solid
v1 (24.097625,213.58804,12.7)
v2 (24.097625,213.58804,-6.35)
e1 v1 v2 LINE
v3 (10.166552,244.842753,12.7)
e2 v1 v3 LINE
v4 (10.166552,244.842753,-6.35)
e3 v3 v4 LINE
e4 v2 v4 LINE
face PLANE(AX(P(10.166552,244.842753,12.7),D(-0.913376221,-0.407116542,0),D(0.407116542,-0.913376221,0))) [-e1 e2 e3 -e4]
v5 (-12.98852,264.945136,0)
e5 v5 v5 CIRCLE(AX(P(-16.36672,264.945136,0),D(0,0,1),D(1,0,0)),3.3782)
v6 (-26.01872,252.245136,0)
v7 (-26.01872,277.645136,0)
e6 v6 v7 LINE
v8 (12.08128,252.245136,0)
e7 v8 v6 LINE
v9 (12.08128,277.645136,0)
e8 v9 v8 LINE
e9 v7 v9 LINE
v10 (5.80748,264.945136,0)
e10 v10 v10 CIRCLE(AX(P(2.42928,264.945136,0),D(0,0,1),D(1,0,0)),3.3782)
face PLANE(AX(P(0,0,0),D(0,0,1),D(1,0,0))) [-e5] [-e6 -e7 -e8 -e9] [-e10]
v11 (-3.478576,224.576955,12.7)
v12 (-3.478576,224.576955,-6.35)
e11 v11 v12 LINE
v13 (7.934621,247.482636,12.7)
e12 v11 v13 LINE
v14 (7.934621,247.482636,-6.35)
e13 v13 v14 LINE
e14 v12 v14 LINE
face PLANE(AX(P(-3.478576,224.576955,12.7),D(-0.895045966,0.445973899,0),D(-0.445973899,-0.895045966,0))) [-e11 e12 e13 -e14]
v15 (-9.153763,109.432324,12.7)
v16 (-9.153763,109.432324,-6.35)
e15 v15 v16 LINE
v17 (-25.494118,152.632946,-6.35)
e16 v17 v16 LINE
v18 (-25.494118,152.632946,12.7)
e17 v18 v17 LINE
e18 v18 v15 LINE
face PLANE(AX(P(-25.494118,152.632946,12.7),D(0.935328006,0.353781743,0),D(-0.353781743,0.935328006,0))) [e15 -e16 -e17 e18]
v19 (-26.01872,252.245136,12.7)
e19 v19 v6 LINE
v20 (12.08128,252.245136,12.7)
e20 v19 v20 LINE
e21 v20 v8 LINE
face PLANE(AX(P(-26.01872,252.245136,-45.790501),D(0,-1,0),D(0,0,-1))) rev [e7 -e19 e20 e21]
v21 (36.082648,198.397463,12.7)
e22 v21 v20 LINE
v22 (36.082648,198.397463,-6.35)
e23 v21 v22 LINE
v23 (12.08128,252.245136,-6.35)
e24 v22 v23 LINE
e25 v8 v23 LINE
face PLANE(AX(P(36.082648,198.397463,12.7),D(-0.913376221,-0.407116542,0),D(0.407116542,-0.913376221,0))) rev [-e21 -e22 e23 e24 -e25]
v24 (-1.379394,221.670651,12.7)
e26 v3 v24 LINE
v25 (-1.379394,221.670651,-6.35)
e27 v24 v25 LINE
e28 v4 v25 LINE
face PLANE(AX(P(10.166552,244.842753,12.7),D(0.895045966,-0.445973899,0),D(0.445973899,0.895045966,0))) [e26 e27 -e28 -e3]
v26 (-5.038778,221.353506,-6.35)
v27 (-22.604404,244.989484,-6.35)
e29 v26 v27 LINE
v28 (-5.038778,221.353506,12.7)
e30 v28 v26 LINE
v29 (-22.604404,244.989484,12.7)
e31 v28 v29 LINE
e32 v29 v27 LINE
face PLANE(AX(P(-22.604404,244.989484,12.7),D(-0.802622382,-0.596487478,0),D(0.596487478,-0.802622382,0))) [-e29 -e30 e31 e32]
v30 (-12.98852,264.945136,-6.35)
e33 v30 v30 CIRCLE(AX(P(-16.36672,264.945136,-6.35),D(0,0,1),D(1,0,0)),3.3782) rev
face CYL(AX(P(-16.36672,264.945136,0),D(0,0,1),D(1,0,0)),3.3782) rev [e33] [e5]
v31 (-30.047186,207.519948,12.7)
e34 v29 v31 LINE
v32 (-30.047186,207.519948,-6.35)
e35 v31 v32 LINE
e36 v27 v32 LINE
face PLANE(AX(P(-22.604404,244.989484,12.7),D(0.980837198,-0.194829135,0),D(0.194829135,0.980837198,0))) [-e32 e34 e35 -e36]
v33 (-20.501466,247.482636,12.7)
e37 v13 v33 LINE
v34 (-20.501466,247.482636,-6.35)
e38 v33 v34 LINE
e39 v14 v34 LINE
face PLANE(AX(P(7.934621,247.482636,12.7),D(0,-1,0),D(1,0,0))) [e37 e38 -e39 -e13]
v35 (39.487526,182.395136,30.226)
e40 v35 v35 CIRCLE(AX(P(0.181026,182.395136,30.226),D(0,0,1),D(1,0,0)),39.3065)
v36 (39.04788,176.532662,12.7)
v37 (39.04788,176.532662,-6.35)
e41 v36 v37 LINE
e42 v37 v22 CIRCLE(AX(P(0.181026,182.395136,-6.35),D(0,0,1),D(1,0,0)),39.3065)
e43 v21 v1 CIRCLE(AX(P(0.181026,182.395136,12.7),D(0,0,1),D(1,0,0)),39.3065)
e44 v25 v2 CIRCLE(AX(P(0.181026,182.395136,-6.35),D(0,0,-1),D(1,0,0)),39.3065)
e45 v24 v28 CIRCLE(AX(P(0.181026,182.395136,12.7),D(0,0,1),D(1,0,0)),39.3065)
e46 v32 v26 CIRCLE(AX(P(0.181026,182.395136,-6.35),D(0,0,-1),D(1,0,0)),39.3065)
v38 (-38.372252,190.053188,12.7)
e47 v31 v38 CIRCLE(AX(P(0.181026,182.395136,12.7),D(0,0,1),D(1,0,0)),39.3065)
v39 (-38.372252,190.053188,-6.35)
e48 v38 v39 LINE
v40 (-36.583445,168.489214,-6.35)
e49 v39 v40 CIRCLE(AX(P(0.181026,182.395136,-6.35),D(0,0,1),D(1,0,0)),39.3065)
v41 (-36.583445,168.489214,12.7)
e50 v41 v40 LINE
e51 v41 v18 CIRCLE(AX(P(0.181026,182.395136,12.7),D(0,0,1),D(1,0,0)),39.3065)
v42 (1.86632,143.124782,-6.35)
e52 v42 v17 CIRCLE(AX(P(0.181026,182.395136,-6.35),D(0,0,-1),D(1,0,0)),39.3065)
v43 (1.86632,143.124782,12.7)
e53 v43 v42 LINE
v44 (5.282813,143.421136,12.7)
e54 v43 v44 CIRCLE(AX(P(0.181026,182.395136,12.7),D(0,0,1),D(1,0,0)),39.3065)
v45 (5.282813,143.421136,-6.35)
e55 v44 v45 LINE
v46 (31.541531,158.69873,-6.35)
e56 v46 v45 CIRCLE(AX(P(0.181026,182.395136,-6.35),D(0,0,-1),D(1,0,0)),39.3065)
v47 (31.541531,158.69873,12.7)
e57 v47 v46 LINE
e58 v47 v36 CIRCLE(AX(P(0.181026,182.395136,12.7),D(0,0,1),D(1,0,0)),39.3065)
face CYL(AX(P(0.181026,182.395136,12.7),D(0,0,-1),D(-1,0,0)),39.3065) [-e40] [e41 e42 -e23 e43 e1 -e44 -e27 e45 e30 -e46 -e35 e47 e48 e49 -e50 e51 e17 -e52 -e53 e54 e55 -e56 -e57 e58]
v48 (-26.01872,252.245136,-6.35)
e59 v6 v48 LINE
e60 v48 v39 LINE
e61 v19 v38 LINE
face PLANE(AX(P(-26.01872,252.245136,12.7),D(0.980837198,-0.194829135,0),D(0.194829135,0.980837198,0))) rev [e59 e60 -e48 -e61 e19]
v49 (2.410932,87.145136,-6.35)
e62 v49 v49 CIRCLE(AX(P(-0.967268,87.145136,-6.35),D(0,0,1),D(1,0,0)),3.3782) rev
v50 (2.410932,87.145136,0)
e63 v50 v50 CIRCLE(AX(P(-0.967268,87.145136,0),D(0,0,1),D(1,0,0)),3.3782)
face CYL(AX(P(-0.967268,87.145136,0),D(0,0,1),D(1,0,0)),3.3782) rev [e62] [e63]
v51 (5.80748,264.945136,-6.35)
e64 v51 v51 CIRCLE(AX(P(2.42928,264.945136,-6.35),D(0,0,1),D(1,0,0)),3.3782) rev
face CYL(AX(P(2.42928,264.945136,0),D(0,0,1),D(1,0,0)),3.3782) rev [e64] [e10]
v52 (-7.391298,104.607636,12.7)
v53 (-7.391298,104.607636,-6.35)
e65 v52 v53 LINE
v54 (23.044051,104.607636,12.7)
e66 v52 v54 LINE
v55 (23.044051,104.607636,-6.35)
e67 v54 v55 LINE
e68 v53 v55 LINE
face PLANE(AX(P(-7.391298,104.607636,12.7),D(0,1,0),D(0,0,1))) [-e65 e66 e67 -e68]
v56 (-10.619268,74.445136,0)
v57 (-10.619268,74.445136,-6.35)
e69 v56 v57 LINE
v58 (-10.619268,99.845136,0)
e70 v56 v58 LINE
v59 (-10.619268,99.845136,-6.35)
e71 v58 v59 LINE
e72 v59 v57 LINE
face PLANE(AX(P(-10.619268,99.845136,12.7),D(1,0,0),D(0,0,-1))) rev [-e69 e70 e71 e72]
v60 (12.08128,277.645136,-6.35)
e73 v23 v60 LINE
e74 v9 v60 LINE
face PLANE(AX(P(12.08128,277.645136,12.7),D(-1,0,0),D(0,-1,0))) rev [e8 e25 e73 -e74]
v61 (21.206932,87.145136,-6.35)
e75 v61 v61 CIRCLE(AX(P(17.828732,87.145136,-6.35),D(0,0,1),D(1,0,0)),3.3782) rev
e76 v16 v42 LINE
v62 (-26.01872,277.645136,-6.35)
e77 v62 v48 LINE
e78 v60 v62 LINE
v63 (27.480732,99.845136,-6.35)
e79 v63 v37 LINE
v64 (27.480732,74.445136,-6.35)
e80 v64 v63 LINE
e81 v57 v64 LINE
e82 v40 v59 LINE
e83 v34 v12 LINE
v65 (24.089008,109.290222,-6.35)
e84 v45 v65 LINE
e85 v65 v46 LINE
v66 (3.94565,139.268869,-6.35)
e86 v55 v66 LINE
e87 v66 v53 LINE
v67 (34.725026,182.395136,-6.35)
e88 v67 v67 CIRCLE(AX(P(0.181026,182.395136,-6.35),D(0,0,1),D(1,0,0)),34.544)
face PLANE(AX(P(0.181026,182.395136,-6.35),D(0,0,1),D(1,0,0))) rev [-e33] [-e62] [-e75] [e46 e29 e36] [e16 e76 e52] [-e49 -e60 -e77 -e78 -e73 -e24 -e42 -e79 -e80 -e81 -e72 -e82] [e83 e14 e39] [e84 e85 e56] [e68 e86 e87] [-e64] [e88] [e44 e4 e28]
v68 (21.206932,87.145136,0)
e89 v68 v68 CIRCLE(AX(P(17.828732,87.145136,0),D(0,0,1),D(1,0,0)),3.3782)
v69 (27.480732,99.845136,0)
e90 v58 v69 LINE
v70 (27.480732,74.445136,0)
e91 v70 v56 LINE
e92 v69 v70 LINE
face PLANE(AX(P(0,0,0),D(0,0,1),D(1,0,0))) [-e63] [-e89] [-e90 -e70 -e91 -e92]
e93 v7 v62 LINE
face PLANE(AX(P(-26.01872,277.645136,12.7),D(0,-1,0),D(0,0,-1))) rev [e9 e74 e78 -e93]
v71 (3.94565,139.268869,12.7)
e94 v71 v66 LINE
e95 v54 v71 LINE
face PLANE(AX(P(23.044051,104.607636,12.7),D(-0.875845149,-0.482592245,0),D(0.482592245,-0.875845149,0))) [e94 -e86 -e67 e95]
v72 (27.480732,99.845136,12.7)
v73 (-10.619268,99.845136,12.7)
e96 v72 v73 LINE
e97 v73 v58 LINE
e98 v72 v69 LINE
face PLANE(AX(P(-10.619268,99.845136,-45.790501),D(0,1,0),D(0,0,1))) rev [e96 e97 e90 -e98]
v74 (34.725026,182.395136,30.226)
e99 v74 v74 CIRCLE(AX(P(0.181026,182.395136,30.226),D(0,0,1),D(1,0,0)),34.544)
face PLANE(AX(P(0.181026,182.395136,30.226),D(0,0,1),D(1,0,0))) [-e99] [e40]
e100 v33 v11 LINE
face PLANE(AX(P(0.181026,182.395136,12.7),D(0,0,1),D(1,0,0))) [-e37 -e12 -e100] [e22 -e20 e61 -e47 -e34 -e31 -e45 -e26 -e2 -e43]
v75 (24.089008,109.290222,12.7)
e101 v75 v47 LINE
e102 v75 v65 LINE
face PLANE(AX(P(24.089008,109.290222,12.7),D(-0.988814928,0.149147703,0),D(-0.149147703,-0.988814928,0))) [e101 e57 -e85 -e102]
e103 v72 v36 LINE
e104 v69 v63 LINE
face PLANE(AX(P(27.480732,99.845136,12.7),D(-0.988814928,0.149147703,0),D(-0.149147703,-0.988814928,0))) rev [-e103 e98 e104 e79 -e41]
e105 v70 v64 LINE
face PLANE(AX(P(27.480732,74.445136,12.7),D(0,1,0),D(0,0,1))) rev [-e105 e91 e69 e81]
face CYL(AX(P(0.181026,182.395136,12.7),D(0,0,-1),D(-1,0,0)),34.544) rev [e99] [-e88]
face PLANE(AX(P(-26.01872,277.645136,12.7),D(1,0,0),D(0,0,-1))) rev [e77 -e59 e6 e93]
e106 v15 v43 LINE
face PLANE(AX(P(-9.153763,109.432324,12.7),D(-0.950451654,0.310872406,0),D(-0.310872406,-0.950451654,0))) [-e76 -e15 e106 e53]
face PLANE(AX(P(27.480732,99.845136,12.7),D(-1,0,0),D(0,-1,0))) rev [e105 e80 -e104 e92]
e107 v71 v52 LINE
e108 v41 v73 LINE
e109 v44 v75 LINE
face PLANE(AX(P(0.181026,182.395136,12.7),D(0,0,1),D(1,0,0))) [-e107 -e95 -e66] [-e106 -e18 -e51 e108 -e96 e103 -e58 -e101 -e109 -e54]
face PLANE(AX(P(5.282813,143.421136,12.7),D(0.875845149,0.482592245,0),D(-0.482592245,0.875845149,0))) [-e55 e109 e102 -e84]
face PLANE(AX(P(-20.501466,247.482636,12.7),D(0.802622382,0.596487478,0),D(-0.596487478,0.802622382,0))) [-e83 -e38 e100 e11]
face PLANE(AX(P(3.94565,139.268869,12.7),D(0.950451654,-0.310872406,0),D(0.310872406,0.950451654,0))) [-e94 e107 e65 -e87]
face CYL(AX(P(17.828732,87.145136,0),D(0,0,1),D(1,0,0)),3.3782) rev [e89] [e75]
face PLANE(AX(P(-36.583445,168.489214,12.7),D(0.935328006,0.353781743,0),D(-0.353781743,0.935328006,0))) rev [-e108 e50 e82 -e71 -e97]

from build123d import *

# Parameters (mm, degrees)
MAIN_START                  = -6.35
MAIN_BODY_EXTRUDE_OUTLINE_R = 34.544
MAIN_BODY_EXTRUDE_DEPTH     = 19.05
A_START                     = -12.7
SKETCH3_W                   = 38.1
SKETCH3_H                   = 25.4
A_ARM_CUT_EXTRUDE_DEPTH     = 12.7
SKETCH2_R                   = 39.3065
SKETCH2_R_2                 = 34.544
WHEEL_BEARING_EXTRUDE_DEPTH = 17.526
F_1_4_CLEARANCE_HOLE1_D     = 6.7564


# Read off the part's stored shape, not the designer's step: Main Body Extrude
with BuildPart() as part:
    # Main Body Extrude outline → Main Body Extrude (new body)
    with BuildSketch(Plane.XY.offset(MAIN_START)):
        with BuildLine():
            Line((27.480731972, 99.845136477), (39.047879642, 176.532662304))
            ThreePointArc((39.047879642, 176.532662304), (39.130976131, 187.677399272), (36.082648081, 198.397462855))
            Line((36.082648081, 198.397462855), (12.081280182, 252.245136477))
            Line((12.081280182, 252.245136477), (12.081280182, 277.645136477))
            Line((12.081280182, 277.645136477), (-26.018719818, 277.645136477))
            Line((-26.018719818, 277.645136477), (-26.018719818, 252.245136477))
            Line((-26.018719818, 252.245136477), (-38.372251652, 190.053187868))
            ThreePointArc((-38.372251652, 190.053187868), (-38.990928758, 179.14568581), (-36.583444609, 168.489214415))
            Line((-36.583444609, 168.489214415), (-10.619268028, 99.845136477))
            Line((-10.619268028, 99.845136477), (-10.619268028, 74.445136477))
            Line((-10.619268028, 74.445136477), (27.480731972, 74.445136477))
            Line((27.480731972, 74.445136477), (27.480731972, 99.845136477))
        make_face()
        with BuildLine():
            ThreePointArc((-25.494117557, 152.632946315), (-12.721668299, 145.266691439), (1.866319763, 143.124782188))
            Line((1.866319763, 143.124782188), (-9.153762694, 109.432323748))
            Line((-9.153762694, 109.432323748), (-25.494117557, 152.632946315))
        make_face(mode=Mode.SUBTRACT)
        Polygon((-7.391297603, 104.607636477), (3.945650004, 139.268868599), (23.044050934, 104.607636477), align=None, mode=Mode.SUBTRACT)
        with BuildLine():
            ThreePointArc((5.282813212, 143.421136093), (19.947813793, 148.420513168), (31.541530581, 158.698730145))
            Line((31.541530581, 158.698730145), (24.089008073, 109.290221793))
            Line((24.089008073, 109.290221793), (5.282813212, 143.421136093))
        make_face(mode=Mode.SUBTRACT)
        with BuildLine():
            ThreePointArc((-5.038778466, 221.353506402), (-18.844806738, 216.790174549), (-30.047186356, 207.519947737))
            Line((-30.047186356, 207.519947737), (-22.604404483, 244.989483896))
            Line((-22.604404483, 244.989483896), (-5.038778466, 221.353506402))
        make_face(mode=Mode.SUBTRACT)
        Polygon((-3.478576257, 224.576955104), (-20.501465739, 247.482636477), (7.934620863, 247.482636477), align=None, mode=Mode.SUBTRACT)
        with Locations((0.181025656, 182.395136477)):
            Circle(MAIN_BODY_EXTRUDE_OUTLINE_R, mode=Mode.SUBTRACT)
        with BuildLine():
            Line((-1.379394493, 221.670650875), (10.166551929, 244.842753057))
            Line((10.166551929, 244.842753057), (24.09762487, 213.588039906))
            ThreePointArc((24.09762487, 213.588039906), (12.067229239, 219.861376035), (-1.379394493, 221.670650875))
        make_face(mode=Mode.SUBTRACT)
    extrude(amount=MAIN_BODY_EXTRUDE_DEPTH)

    # Sketch3 → A Arm Cut Extrude (cut)
    with BuildSketch(Plane.XY.offset(12.7).offset(A_START)):
        with Locations((-6.968719818, 264.945136477)):
            Rectangle(SKETCH3_W, SKETCH3_H)
        with Locations((8.430731972, 87.145136477)):
            Rectangle(SKETCH3_W, SKETCH3_H)
    extrude(amount=A_ARM_CUT_EXTRUDE_DEPTH, mode=Mode.SUBTRACT)

    # Sketch2 → Wheel Bearing Extrude (add)
    with BuildSketch(Plane.XY.offset(12.7)):
        with Locations(Location((0.181025656, 182.395136477, 0), (0, 0, 168.765257697))):
            Circle(SKETCH2_R)
        with Locations((0.181025656, 182.395136477)):
            Circle(SKETCH2_R_2, mode=Mode.SUBTRACT)
    extrude(amount=WHEEL_BEARING_EXTRUDE_DEPTH)

    # 1/4 Clearance Hole1 (through all)
    with Locations(Plane(origin=(-16.366719818, 264.945136477, 0), x_dir=(1, 0, 0), z_dir=(0, 0, 1))):
        with Locations((0, 0), (18.796, 0), (15.39945179, -177.8), (34.19545179, -177.8)):
            Hole(F_1_4_CLEARANCE_HOLE1_D / 2)


solid = part.part
